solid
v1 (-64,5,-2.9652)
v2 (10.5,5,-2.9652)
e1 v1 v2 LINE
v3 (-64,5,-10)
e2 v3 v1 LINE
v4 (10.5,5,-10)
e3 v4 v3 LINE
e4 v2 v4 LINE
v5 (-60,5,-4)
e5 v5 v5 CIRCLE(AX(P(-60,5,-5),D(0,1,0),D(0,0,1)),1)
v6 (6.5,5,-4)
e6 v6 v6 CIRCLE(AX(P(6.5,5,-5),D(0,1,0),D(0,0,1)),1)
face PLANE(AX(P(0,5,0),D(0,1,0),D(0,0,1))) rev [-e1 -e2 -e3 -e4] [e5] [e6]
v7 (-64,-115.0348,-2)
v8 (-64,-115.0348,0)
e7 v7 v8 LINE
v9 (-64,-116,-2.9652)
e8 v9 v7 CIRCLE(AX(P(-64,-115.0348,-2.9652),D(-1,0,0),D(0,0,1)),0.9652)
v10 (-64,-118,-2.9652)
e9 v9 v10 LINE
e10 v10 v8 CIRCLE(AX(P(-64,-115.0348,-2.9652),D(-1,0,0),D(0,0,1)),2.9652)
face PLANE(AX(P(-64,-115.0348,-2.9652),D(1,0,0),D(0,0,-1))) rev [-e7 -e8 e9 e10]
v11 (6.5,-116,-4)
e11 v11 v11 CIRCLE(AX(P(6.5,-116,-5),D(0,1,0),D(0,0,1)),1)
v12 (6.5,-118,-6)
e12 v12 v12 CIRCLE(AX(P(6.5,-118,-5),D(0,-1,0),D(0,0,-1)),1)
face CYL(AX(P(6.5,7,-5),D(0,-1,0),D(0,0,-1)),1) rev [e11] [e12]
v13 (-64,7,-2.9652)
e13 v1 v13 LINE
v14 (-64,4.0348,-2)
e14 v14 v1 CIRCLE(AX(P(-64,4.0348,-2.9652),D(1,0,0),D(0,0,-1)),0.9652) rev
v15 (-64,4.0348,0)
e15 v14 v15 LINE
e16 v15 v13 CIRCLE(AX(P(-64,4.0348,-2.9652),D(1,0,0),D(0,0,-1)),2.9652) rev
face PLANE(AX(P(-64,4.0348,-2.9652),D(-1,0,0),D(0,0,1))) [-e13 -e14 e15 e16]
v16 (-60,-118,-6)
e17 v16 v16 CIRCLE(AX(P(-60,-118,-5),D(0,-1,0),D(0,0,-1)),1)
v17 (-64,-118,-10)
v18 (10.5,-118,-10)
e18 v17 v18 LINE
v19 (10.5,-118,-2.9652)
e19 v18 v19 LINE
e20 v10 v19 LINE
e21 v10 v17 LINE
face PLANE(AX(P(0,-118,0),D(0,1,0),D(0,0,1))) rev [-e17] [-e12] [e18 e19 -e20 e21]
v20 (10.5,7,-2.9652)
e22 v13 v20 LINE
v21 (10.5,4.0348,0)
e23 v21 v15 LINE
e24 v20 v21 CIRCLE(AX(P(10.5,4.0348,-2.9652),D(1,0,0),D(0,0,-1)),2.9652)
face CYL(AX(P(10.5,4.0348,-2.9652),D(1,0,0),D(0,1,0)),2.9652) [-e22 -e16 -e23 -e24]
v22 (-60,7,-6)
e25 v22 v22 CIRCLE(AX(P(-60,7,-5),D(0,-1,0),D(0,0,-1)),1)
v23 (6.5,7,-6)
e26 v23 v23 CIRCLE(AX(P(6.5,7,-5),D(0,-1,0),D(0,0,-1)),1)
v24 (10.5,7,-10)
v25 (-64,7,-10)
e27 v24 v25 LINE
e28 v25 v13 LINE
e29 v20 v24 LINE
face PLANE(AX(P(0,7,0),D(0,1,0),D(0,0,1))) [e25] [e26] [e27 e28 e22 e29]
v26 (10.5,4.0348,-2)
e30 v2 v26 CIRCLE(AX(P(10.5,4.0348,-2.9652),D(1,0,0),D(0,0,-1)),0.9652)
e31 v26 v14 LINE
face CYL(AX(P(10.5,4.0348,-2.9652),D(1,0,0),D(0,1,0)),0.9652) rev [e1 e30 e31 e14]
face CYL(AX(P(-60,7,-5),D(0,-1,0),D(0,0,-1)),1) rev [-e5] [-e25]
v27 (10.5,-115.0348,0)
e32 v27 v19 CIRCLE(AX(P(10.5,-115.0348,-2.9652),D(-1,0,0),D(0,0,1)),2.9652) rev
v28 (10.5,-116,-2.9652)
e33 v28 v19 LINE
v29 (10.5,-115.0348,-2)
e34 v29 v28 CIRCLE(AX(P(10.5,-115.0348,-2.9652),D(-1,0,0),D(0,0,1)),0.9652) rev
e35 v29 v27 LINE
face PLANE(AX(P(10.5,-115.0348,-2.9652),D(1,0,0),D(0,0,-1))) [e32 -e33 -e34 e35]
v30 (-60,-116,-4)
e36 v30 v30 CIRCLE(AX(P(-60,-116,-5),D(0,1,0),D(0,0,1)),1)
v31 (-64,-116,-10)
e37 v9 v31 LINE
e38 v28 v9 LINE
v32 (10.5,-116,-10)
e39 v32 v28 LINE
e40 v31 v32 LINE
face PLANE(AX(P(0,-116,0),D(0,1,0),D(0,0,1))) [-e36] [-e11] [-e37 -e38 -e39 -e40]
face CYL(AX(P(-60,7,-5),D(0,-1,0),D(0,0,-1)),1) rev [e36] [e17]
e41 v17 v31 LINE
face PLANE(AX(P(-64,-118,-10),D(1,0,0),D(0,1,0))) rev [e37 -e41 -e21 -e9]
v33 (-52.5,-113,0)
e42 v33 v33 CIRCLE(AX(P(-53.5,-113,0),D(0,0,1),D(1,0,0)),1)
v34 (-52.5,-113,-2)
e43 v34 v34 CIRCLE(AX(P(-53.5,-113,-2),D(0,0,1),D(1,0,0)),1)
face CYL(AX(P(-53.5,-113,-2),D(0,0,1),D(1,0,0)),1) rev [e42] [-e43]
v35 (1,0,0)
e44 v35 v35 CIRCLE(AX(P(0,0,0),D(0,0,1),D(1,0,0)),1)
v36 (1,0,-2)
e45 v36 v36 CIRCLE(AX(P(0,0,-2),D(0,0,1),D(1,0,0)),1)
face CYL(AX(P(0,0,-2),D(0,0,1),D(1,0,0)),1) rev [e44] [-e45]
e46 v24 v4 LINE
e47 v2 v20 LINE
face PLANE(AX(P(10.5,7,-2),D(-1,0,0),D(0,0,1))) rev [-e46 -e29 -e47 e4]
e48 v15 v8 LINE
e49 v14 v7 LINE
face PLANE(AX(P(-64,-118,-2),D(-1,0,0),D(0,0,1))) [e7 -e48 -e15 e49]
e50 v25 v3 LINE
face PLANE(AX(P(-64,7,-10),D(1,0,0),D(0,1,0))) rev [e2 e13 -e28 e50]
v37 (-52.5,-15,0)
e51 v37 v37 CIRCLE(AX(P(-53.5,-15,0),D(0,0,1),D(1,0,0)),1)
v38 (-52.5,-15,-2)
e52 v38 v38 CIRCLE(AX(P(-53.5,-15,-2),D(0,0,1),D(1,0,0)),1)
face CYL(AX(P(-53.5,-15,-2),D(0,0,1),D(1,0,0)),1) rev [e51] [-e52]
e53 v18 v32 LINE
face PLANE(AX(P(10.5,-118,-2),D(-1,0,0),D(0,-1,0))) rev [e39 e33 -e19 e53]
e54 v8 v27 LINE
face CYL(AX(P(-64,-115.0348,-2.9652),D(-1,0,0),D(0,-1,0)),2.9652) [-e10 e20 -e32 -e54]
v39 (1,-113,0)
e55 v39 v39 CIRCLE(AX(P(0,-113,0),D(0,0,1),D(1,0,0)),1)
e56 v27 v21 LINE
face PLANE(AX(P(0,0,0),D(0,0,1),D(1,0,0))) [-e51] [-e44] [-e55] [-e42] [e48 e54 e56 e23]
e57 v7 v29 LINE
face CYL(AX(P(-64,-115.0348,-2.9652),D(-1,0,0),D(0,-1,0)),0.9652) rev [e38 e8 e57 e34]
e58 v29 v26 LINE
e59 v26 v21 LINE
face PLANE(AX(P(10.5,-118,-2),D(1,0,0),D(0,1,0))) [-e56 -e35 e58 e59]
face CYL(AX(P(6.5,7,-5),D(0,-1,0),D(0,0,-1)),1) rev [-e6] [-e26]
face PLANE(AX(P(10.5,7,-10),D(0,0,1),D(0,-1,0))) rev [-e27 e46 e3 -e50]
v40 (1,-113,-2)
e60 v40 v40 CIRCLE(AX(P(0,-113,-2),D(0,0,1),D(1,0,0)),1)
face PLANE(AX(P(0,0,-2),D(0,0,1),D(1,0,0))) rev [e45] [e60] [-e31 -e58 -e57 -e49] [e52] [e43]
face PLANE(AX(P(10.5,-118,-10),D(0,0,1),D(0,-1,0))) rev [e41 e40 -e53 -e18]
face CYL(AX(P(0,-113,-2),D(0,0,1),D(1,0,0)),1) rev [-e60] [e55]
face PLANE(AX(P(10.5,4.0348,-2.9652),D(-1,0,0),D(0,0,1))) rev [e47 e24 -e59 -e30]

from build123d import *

# Parameters (mm, degrees)
SKETCH1_W                      = 125
SKETCH1_H                      = 74.5
SKETCH1_R                      = 1
BASE_FLANGE1_DEPTH             = 2
EDGE_FLANGE2_STRIP_W           = 9.9304
EDGE_FLANGE2_STRIP_H           = 2
EDGE_FLANGE2_STRIP_CUT_DEPTH   = 74.5
EDGE_FLANGE2_STRIP_2_W         = 9.9304
EDGE_FLANGE2_STRIP_2_H         = 2
EDGE_FLANGE2_STRIP_CUT_2_DEPTH = 74.5
EDGE_FLANGE2_DEPTH             = 74.5
EDGE_FLANGE2_BEND_DEPTH        = 74.5
SKETCH20_R                     = 1
CUT_EXTRUDE2_DEPTH             = 141.78707327


# Sheet-metal steps are written as plain solids
with BuildPart() as part:
    # Sketch1 → Base-Flange1 (new body)
    with BuildSketch(Plane(origin=(0, 0, 0), x_dir=(0, 1, 0), z_dir=(0, 0, 1))):
        with Locations((-55.5, 26.75)):
            Rectangle(SKETCH1_W, SKETCH1_H)
        with Locations(Location((0, 0, 0), (0, 0, 270))):
            Circle(SKETCH1_R, mode=Mode.SUBTRACT)
        with Locations(Location((-113, 0, 0), (0, 0, 270))):
            Circle(SKETCH1_R, mode=Mode.SUBTRACT)
        with Locations(Location((-113, 53.5, 0), (0, 0, 270))):
            Circle(SKETCH1_R, mode=Mode.SUBTRACT)
        with Locations(Location((-15, 53.5, 0), (0, 0, 270))):
            Circle(SKETCH1_R, mode=Mode.SUBTRACT)
    extrude(amount=-BASE_FLANGE1_DEPTH)

    # Edge-Flange2 strip (across the edge) → Edge-Flange2 strip cut (cut)
    with BuildSketch(Plane(origin=(10.5, -118, -2), x_dir=(0, 1, 0), z_dir=(-1, 0, 0))):
        with Locations((-2, -1)):
            Rectangle(EDGE_FLANGE2_STRIP_W, EDGE_FLANGE2_STRIP_H)
    extrude(amount=EDGE_FLANGE2_STRIP_CUT_DEPTH, mode=Mode.SUBTRACT)

    # Edge-Flange2 strip 2 (across the edge) → Edge-Flange2 strip cut 2 (cut)
    with BuildSketch(Plane(origin=(-64, 7, -2), x_dir=(0, -1, 0), z_dir=(1, 0, 0))):
        with Locations((-2, -1)):
            Rectangle(EDGE_FLANGE2_STRIP_2_W, EDGE_FLANGE2_STRIP_2_H)
    extrude(amount=EDGE_FLANGE2_STRIP_CUT_2_DEPTH, mode=Mode.SUBTRACT)

    # Edge-Flange2 section (across the edge) → Edge-Flange2 (add)
    with BuildSketch(Plane(origin=(10.5, -118, -2), x_dir=(0, 1, 0), z_dir=(-1, 0, 0))):
        with BuildLine():
            Line((0, 0.9652), (0, 8))
            Line((0, 8), (2, 8))
            Line((2, 8), (2, 0.9652))
            ThreePointArc((2, 0.9652), (2.282700535, 0.282700535), (2.9652, 0))
            Line((2.9652, 0), (2.9652, -2))
            ThreePointArc((2.9652, -2), (0.868486972, -1.131513028), (0, 0.9652))
        make_face()
    extrude(amount=EDGE_FLANGE2_DEPTH)

    # Edge-Flange2 section 2 (across the edge) → Edge-Flange2 bend (add)
    with BuildSketch(Plane(origin=(-64, 7, -2), x_dir=(0, -1, 0), z_dir=(1, 0, 0))):
        with BuildLine():
            Line((0, 0.9652), (0, 8))
            Line((0, 8), (2, 8))
            Line((2, 8), (2, 0.9652))
            ThreePointArc((2, 0.9652), (2.282700535, 0.282700535), (2.9652, 0))
            Line((2.9652, 0), (2.9652, -2))
            ThreePointArc((2.9652, -2), (0.868486972, -1.131513028), (0, 0.9652))
        make_face()
    extrude(amount=EDGE_FLANGE2_BEND_DEPTH)

    # Sketch20 → Cut-Extrude2 (cut, through all)
    with BuildSketch(Plane.XZ.offset(118)):
        with Locations(Location((-60, -5, 0), (0, 0, 270))):
            Circle(SKETCH20_R)
        with Locations(Location((6.5, -5, 0), (0, 0, 270))):
            Circle(SKETCH20_R)
    extrude(amount=-CUT_EXTRUDE2_DEPTH, mode=Mode.SUBTRACT)


solid = part.part
